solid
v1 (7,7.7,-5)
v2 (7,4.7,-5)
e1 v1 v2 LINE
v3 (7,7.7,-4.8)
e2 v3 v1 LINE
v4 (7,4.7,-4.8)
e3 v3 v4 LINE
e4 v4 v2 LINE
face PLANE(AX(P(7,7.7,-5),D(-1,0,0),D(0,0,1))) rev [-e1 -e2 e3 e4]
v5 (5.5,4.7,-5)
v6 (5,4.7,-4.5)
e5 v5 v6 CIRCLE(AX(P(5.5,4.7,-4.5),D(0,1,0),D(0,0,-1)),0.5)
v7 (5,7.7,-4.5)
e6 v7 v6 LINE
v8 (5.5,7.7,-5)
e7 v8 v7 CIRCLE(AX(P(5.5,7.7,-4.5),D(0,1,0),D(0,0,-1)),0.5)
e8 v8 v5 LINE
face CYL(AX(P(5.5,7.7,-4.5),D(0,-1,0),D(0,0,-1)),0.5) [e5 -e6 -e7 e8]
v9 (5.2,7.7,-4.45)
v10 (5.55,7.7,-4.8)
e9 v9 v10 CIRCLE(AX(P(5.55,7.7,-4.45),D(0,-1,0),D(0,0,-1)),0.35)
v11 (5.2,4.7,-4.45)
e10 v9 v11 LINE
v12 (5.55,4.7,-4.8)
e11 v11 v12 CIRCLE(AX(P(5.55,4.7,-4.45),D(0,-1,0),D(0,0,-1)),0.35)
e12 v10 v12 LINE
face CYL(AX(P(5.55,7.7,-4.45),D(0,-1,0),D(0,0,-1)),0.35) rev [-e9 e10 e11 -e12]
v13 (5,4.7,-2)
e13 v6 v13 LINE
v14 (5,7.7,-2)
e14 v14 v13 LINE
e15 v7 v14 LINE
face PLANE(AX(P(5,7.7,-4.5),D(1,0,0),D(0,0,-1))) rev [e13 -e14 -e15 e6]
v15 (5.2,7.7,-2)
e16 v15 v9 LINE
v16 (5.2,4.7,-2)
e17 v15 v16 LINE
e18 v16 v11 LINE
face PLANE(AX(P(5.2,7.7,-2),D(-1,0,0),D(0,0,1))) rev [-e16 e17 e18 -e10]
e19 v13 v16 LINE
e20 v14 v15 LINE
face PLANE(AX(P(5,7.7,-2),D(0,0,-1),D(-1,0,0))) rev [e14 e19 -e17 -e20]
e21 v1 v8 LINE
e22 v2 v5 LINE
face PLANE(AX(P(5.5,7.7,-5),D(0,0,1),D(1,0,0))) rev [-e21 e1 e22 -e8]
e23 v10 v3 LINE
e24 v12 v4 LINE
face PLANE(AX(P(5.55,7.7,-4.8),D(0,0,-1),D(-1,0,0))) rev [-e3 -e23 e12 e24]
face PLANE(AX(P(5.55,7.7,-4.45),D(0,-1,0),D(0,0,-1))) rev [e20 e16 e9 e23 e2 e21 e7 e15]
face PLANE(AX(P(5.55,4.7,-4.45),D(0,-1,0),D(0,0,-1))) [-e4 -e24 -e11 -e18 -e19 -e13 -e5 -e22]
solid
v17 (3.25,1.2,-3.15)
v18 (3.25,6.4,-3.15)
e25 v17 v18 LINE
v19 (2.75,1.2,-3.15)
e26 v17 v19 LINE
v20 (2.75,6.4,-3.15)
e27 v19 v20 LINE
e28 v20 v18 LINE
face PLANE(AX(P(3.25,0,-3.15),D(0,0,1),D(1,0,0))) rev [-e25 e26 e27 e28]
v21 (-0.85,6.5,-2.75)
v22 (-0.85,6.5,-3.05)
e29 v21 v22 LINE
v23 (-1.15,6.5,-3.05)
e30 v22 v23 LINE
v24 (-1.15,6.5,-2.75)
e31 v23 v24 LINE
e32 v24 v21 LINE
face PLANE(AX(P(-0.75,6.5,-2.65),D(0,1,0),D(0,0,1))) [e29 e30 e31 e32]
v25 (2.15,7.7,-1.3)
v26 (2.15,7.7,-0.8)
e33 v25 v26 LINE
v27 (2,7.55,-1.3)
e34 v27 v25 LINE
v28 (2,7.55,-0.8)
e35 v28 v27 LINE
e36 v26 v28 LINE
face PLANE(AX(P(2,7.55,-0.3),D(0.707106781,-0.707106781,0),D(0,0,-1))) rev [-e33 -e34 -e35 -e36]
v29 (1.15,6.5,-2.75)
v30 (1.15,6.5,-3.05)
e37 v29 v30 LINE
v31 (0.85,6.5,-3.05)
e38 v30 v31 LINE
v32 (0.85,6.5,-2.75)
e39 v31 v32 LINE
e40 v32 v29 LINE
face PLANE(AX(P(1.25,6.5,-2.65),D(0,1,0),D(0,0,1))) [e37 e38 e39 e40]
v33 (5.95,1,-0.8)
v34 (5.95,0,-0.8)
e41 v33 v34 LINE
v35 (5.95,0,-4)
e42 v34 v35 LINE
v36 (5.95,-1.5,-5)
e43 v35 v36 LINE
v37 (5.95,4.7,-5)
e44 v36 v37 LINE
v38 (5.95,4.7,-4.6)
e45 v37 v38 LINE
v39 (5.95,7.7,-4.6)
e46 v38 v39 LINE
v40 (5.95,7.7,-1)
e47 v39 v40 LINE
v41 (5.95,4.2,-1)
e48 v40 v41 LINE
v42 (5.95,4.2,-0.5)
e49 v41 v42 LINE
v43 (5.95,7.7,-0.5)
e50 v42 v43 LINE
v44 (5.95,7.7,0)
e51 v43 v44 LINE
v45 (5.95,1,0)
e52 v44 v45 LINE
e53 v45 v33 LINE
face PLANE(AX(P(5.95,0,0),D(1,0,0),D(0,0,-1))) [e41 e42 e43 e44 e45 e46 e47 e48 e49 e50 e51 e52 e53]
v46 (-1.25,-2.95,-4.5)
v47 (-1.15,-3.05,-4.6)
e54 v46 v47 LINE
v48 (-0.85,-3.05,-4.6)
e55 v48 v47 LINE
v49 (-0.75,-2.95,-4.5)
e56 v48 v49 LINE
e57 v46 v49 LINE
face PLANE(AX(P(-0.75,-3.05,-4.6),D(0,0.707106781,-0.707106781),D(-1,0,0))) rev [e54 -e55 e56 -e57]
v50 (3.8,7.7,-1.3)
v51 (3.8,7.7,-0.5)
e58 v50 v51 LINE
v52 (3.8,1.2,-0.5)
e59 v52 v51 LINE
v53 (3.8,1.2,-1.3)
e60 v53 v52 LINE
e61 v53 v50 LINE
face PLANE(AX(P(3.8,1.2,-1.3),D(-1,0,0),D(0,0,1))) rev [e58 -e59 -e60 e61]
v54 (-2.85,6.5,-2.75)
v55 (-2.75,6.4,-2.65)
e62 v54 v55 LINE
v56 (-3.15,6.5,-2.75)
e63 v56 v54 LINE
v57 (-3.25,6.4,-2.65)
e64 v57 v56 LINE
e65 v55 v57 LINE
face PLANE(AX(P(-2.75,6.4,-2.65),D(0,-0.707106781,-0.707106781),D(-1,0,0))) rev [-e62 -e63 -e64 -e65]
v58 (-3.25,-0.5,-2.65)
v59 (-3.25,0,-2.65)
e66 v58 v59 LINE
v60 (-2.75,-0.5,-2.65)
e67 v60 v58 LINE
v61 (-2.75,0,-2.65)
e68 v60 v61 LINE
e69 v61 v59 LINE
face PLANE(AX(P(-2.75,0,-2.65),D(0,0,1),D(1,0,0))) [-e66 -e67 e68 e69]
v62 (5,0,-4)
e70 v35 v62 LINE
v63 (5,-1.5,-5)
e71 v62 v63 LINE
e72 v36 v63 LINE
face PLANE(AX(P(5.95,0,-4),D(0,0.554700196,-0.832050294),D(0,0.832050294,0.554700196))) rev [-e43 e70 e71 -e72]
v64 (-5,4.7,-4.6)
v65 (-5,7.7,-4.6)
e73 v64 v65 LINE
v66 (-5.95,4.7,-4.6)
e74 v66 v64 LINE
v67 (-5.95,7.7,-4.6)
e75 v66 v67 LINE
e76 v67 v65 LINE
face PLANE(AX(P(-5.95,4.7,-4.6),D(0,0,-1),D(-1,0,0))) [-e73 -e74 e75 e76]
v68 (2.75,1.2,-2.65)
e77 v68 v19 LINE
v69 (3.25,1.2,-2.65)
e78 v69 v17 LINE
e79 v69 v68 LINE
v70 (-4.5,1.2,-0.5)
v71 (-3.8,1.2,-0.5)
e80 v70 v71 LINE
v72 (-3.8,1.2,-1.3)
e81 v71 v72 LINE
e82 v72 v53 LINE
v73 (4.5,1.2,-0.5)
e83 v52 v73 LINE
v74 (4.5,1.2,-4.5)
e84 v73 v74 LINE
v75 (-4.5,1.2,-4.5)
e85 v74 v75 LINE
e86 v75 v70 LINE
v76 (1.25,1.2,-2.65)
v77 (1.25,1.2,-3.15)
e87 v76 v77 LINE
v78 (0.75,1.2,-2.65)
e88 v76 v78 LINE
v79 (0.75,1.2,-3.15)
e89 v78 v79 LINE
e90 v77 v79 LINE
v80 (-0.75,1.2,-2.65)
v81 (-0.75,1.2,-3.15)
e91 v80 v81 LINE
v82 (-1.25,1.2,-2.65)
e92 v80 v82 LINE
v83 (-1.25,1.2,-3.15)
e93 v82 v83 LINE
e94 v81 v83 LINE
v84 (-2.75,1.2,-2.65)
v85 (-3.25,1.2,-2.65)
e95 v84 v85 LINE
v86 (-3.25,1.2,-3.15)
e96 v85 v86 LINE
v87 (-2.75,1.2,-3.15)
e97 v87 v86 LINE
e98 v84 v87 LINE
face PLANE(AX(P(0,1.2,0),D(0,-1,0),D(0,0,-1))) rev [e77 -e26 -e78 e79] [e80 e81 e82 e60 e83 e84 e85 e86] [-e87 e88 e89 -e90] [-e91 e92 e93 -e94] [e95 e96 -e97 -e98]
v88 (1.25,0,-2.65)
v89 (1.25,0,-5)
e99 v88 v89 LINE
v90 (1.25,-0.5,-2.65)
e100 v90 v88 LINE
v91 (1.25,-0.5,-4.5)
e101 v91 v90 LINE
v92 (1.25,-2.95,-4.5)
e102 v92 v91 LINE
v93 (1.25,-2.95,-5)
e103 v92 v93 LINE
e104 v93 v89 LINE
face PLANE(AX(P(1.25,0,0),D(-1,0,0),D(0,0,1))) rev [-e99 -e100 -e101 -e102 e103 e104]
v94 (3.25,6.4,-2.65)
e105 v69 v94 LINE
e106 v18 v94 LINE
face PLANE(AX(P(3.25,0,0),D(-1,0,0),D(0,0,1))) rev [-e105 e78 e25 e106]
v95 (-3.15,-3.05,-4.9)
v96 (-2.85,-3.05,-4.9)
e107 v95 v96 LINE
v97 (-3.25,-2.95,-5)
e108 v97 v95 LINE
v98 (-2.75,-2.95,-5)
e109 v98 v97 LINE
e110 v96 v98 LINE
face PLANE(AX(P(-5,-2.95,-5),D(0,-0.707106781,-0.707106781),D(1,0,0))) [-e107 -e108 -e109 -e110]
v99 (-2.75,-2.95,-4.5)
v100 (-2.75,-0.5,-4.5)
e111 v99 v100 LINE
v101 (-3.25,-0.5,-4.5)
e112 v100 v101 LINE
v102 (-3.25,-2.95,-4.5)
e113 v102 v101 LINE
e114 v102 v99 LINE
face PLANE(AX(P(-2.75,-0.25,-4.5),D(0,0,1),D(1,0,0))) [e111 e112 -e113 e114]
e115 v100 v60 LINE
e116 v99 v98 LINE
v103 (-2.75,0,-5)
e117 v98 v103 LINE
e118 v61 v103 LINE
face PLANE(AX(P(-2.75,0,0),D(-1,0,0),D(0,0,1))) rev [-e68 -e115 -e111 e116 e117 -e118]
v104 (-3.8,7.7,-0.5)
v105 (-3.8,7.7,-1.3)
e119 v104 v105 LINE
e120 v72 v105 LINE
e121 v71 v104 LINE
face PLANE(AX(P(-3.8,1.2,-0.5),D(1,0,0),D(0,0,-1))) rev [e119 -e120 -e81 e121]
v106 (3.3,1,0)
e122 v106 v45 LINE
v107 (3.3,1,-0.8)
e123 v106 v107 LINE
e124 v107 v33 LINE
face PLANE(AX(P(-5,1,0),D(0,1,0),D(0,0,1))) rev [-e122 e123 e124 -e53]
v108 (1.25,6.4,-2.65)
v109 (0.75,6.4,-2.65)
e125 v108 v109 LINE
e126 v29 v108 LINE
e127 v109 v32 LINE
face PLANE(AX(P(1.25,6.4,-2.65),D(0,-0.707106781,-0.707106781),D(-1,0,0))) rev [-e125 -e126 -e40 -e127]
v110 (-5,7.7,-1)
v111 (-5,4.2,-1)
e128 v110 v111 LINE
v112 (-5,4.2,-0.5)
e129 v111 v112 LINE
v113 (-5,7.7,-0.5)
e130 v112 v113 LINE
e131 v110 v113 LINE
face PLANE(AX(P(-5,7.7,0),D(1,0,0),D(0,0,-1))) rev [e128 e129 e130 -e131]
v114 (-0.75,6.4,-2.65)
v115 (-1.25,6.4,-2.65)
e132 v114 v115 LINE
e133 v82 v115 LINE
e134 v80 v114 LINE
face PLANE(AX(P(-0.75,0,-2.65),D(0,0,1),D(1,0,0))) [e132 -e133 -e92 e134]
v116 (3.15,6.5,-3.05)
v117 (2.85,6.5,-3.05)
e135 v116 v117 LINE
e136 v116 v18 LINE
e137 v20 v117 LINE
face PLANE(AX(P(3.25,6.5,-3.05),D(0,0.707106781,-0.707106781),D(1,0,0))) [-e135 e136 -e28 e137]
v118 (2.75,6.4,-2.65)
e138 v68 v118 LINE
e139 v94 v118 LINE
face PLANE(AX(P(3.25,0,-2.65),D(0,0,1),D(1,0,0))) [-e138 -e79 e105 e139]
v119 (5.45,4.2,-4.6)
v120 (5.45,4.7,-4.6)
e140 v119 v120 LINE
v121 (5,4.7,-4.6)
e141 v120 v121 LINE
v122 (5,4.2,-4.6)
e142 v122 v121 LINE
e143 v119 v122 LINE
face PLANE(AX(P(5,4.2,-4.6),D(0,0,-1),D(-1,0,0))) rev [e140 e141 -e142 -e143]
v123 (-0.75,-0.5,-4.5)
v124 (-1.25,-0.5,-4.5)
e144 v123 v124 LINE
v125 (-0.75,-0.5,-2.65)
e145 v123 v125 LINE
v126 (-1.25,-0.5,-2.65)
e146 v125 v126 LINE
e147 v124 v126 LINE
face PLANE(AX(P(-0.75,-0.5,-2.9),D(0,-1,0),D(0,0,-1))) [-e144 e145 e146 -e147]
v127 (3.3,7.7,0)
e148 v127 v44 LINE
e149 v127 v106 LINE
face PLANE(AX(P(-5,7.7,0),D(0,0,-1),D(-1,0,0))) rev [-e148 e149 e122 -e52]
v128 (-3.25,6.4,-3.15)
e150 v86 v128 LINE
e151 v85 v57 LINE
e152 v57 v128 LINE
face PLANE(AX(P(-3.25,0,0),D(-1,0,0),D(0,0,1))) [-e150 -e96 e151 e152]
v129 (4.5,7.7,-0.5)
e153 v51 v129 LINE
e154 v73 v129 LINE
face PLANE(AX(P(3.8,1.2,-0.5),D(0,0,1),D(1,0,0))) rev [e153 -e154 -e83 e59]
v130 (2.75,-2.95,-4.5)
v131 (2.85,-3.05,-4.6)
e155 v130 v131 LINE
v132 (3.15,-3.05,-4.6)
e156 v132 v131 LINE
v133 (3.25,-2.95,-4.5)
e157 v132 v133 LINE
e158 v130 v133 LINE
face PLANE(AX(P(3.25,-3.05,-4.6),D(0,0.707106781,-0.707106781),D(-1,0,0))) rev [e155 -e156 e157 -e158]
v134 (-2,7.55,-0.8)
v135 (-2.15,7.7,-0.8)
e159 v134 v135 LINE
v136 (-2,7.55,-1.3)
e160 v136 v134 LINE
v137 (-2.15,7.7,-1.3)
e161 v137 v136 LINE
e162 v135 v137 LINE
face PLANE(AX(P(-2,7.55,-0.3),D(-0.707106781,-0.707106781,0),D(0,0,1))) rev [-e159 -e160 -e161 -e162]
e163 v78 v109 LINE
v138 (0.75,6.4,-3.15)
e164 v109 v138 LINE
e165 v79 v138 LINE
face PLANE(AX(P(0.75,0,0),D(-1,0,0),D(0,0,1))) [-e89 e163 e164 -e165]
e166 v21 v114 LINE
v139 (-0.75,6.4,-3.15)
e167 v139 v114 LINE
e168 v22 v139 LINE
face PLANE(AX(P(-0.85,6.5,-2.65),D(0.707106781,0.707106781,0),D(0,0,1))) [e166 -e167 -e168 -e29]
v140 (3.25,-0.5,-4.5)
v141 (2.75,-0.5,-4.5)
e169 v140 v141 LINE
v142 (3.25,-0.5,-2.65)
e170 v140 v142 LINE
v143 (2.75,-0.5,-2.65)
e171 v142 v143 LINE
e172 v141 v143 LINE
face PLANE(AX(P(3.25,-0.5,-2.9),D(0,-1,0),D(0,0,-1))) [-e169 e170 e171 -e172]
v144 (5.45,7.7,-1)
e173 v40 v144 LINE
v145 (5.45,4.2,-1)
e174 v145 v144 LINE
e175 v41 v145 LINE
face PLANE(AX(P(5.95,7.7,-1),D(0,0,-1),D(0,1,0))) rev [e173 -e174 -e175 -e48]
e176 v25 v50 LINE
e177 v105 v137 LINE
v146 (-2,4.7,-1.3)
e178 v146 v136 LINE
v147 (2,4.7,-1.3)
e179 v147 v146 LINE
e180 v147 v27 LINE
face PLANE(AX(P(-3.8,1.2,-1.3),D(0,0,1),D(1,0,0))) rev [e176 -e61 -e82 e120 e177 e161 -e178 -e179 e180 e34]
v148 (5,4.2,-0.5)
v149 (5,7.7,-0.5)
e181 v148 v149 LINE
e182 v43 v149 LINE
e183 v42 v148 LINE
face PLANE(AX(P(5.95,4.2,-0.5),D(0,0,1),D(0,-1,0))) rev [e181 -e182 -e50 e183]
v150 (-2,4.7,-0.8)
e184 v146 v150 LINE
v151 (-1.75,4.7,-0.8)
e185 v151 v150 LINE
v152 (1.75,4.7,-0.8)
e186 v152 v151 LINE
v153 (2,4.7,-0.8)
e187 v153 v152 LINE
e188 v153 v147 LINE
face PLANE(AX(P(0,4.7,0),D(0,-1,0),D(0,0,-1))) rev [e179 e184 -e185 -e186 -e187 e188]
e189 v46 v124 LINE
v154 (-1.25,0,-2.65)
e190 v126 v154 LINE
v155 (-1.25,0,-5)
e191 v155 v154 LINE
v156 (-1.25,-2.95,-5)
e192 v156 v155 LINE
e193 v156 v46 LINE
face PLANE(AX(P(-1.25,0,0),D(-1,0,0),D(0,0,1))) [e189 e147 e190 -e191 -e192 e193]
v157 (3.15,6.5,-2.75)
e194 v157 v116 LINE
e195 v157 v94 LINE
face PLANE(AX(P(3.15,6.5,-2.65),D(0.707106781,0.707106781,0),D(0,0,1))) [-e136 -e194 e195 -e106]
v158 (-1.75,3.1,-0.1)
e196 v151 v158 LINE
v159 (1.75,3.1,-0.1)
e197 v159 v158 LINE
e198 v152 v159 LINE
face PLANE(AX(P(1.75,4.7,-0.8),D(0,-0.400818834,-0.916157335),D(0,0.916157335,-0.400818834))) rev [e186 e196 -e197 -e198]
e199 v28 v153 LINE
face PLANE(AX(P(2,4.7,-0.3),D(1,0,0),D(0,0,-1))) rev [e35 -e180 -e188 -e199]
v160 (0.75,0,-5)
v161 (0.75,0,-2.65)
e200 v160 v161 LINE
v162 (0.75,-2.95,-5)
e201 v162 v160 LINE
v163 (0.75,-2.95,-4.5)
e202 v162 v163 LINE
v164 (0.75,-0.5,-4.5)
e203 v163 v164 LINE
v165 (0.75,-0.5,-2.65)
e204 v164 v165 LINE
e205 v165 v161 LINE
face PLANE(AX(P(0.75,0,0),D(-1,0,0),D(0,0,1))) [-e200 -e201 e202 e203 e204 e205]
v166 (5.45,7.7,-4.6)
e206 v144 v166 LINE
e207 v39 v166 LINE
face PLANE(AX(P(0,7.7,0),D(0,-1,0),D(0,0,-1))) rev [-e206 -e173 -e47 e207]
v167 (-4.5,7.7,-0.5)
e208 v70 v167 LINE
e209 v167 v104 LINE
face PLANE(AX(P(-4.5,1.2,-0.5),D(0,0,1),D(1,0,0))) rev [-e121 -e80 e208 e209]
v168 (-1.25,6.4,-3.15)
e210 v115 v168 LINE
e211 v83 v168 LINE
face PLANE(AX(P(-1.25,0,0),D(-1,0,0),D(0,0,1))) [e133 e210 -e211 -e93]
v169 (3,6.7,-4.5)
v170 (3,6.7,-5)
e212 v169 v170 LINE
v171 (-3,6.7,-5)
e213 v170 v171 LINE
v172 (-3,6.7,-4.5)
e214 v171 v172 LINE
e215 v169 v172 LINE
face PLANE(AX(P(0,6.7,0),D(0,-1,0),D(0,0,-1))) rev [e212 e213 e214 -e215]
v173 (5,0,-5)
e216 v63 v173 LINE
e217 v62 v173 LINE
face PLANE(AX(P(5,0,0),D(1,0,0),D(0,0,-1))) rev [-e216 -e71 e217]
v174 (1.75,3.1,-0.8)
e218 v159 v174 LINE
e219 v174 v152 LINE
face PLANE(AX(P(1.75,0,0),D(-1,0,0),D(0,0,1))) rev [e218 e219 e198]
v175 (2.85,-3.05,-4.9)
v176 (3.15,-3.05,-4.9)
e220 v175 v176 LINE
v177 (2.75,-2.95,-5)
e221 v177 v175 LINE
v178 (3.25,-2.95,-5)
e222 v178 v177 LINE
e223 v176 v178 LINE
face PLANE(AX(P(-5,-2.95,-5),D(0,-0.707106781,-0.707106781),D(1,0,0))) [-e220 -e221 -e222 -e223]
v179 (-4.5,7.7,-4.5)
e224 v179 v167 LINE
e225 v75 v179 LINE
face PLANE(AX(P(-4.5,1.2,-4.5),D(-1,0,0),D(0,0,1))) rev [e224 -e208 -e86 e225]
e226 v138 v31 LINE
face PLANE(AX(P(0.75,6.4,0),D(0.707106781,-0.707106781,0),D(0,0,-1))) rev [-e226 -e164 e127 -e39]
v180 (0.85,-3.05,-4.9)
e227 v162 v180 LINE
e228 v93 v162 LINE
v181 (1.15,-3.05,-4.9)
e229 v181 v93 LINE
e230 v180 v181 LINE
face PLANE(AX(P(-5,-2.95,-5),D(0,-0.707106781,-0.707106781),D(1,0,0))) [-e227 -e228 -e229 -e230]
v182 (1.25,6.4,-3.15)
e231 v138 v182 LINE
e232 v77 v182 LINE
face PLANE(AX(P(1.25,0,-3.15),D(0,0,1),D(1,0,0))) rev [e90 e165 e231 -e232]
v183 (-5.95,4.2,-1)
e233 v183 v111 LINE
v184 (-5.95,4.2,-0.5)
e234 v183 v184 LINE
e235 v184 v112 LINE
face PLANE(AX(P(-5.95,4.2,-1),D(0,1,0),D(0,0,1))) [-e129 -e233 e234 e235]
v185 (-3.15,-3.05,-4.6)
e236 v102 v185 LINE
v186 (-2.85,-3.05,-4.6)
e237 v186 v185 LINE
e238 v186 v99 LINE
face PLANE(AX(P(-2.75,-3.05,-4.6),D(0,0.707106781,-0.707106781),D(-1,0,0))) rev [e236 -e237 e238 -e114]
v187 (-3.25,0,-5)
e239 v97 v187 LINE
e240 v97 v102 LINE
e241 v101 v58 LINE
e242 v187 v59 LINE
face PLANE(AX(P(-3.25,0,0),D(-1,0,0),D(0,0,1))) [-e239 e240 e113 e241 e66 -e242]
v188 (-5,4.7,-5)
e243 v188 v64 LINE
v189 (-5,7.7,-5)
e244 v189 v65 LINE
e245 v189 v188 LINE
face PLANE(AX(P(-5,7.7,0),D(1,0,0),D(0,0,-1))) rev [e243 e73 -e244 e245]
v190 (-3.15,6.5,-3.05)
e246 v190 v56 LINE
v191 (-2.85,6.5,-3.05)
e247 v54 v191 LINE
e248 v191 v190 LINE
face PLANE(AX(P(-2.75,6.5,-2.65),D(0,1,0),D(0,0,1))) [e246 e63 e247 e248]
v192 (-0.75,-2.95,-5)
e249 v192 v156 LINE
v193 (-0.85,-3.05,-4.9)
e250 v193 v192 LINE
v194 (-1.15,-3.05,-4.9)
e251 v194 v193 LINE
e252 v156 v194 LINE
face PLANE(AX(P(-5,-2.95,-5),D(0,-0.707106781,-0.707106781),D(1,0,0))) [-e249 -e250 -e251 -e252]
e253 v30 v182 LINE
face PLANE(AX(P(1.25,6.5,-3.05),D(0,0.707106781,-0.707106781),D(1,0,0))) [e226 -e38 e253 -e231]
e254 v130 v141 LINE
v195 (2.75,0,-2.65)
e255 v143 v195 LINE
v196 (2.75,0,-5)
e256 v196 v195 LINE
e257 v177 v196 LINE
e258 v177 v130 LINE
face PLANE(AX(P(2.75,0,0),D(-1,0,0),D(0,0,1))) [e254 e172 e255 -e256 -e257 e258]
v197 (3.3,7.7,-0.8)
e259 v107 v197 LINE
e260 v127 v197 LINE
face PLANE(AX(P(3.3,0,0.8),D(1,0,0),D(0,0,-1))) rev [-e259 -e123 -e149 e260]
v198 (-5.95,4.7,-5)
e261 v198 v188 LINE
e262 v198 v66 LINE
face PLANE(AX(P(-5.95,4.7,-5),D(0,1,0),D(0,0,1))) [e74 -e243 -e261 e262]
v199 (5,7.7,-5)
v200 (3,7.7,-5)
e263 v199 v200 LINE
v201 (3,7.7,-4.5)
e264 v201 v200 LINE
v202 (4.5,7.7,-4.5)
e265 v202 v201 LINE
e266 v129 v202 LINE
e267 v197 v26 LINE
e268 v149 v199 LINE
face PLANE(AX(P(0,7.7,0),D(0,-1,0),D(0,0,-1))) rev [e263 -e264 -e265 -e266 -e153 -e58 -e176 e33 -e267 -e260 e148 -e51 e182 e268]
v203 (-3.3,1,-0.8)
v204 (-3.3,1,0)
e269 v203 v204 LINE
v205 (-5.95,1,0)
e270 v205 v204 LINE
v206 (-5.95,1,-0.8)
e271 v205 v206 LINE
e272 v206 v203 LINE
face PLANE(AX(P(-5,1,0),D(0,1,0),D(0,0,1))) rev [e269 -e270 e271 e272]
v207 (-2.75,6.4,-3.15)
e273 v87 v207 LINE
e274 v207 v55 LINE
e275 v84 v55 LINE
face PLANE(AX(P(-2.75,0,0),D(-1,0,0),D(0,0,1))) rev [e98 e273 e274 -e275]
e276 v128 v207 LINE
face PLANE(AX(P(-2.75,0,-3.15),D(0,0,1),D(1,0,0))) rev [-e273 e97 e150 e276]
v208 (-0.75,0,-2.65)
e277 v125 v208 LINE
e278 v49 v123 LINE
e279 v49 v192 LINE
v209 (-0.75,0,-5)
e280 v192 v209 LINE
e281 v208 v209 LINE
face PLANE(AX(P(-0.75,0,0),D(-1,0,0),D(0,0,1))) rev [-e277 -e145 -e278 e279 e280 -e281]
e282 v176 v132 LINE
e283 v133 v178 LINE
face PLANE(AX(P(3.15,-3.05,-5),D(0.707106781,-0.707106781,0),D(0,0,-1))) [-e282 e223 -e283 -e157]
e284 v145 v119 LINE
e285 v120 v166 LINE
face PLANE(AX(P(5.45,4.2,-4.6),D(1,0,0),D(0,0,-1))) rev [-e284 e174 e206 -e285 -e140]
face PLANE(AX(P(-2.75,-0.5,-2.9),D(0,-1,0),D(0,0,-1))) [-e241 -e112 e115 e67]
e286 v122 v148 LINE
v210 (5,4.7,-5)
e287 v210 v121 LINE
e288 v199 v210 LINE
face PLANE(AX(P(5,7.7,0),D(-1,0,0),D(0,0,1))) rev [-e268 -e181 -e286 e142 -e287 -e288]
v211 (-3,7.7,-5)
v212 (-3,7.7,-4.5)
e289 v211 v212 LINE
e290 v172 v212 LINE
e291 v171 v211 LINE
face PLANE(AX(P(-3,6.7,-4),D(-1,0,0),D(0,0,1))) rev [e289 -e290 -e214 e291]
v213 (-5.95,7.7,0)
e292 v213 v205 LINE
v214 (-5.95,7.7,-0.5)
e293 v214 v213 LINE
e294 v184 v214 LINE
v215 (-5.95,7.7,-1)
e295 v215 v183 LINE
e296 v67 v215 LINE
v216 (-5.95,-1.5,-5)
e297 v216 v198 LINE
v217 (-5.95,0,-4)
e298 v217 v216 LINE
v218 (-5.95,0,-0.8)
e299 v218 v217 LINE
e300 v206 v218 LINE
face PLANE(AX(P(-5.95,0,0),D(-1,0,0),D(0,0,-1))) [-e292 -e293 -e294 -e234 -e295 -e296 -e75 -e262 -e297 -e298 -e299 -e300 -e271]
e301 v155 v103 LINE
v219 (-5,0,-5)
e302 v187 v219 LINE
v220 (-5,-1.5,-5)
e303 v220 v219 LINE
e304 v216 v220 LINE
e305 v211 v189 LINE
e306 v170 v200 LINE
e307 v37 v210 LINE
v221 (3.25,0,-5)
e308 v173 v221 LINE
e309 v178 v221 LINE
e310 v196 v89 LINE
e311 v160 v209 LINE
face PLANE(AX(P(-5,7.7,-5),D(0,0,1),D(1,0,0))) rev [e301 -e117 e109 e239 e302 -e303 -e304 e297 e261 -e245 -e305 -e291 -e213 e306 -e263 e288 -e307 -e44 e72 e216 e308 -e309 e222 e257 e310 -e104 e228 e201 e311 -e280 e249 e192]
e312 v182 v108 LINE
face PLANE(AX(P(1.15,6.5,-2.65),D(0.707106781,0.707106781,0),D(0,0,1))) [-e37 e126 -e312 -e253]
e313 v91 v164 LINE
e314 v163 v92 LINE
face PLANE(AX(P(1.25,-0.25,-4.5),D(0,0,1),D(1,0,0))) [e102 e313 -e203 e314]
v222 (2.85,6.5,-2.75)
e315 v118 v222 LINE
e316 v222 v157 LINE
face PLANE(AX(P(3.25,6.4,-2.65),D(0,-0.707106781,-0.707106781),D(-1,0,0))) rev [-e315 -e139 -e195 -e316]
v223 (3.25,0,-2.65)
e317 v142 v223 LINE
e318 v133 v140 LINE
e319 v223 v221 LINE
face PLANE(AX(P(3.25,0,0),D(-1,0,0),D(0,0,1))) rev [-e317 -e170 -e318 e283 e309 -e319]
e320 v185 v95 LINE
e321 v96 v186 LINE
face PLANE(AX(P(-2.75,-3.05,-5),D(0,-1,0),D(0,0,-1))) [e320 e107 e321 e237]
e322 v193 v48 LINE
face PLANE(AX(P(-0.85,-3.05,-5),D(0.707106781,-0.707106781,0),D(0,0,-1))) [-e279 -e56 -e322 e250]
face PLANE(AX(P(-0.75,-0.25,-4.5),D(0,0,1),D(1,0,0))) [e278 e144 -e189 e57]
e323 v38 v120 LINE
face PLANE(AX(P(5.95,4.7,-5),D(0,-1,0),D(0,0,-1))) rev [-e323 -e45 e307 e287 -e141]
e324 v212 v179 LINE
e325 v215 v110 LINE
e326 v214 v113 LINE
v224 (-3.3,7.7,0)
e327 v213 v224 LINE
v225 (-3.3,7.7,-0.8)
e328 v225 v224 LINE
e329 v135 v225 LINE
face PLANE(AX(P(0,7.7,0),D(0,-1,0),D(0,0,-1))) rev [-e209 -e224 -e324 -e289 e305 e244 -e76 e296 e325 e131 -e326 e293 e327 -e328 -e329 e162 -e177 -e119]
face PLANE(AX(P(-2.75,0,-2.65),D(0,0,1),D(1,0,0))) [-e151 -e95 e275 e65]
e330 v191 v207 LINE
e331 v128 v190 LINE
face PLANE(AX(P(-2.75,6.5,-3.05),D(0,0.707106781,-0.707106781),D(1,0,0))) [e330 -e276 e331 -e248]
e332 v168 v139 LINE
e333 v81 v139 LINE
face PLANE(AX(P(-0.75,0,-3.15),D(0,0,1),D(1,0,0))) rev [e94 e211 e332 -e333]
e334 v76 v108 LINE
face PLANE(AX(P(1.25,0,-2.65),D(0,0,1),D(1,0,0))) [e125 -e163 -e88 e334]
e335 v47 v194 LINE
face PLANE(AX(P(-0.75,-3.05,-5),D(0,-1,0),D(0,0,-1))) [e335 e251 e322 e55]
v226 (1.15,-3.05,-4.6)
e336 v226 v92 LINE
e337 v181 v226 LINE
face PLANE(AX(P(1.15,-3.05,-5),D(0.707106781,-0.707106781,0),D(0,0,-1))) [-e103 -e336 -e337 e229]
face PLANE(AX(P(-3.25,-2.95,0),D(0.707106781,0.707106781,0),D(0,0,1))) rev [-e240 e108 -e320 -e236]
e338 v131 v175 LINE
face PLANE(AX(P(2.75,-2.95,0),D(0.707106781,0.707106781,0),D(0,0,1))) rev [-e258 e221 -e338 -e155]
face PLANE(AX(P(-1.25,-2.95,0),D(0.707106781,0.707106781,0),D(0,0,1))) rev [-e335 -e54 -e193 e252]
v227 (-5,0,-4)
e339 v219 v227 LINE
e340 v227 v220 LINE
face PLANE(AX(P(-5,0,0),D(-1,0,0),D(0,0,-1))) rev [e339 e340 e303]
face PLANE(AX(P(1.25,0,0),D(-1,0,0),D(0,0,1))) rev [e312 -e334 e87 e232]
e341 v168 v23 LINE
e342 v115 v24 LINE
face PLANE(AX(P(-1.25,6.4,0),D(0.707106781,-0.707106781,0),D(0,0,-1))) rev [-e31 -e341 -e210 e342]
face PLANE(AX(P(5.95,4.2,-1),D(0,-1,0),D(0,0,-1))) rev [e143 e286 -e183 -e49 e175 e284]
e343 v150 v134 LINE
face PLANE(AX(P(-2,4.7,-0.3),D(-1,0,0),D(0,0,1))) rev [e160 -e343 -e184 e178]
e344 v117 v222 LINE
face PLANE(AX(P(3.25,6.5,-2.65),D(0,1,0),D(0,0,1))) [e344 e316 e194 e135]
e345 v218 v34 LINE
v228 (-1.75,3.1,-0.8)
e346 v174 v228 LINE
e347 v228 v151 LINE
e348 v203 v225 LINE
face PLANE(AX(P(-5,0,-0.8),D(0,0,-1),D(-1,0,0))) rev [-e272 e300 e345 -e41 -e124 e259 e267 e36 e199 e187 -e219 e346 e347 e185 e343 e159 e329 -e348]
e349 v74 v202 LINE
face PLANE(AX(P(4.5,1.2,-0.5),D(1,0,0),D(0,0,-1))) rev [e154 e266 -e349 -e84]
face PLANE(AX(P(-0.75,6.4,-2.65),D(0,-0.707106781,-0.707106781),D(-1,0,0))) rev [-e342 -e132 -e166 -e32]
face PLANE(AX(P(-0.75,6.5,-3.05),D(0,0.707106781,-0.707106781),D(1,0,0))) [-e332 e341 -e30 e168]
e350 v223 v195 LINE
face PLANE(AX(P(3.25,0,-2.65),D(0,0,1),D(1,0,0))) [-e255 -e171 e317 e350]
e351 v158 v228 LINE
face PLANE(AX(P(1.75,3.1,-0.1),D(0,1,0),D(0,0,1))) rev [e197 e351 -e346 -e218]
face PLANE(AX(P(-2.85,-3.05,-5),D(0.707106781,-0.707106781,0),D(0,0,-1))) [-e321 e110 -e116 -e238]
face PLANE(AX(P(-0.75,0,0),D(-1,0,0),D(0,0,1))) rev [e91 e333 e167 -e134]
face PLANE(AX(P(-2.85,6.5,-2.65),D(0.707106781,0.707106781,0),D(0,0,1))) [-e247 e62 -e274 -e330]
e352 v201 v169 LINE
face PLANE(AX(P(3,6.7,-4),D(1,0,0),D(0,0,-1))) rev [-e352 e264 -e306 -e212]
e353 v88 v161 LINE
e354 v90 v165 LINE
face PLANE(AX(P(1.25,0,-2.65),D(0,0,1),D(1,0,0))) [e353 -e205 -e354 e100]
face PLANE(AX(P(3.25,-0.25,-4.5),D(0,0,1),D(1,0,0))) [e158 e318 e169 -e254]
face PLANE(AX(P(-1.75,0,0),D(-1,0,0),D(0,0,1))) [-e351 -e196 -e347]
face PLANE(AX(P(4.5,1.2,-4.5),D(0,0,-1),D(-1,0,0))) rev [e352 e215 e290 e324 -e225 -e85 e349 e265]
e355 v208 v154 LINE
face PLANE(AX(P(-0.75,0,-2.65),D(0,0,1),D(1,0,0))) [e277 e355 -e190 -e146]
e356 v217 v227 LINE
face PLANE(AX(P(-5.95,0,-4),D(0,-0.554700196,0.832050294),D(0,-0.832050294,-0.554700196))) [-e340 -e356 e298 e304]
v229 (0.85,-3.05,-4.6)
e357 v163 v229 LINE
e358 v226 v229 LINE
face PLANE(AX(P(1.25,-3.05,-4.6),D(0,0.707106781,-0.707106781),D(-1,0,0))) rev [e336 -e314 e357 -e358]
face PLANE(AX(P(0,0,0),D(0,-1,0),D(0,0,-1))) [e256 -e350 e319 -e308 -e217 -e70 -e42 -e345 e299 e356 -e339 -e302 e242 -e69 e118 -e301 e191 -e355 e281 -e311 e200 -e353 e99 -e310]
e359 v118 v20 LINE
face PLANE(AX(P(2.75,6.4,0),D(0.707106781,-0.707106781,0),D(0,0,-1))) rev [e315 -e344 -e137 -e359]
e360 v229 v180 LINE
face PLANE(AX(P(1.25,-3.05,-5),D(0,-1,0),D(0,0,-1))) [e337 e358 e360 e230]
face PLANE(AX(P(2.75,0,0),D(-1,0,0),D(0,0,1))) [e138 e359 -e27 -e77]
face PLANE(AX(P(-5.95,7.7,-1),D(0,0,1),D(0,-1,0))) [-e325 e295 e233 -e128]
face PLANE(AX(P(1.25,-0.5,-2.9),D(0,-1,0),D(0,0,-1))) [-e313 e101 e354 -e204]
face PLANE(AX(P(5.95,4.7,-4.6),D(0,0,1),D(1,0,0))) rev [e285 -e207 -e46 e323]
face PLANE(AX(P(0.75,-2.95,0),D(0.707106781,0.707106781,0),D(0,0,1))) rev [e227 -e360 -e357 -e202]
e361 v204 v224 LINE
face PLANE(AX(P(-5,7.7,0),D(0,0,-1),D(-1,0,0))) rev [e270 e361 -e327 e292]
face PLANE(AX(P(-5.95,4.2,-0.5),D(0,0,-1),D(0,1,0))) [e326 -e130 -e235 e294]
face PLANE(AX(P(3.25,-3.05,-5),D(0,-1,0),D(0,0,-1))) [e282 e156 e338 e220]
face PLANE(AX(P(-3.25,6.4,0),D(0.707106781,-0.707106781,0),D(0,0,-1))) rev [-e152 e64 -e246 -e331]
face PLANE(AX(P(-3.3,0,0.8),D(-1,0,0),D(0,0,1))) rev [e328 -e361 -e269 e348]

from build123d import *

# Parameters (mm, degrees)
ESQUISSE1_W                             = 10
ESQUISSE1_H                             = 5
BOSS_EXTRU_1_DEPTH                      = 7.7
ESQUISSE7_W                             = 0.8
ESQUISSE7_H                             = 1
ENL_V_MAT_EXTRU_5_DEPTH                 = 14.575345299
ESQUISSE2_W                             = 6.6
ESQUISSE2_H                             = 1.6
ENL_V_MAT_EXTRU_1_DEPTH                 = 11.454185765
ENL_V_MAT_EXTRU_2_DEPTH                 = 6.5
ESQUISSE5_W                             = 6
ESQUISSE5_H                             = 1
ENL_V_MAT_EXTRU_3_DEPTH                 = 1
ESQUISSE6_W                             = 4
ESQUISSE6_H                             = 1
ENL_V_MAT_EXTRU_4_DEPTH                 = 3
BOSS_EXTRU_2_DEPTH                      = 1.75
CHANFREIN1_SIZE                         = 0.15
EXTRU_MINCE4_START                      = -0.25
EXTRU_MINCE4_OUTLINE_W                  = 0.5
EXTRU_MINCE4_OUTLINE_H                  = 5.3
EXTRU_MINCE4_DEPTH                      = 0.5
CHANFREIN6_SIZE                         = 0.1
R_P_TITION_LIN_AIRE8_COUNT              = 4
R_P_TITION_LIN_AIRE8_PITCH              = 2
CHANFREIN6_OF_R_P_TITION_LIN_AIRE8_SIZE = 0.1
BOSS_EXTRU_3_DEPTH                      = 0.95
ESQUISSE19_W                            = 0.45
ESQUISSE19_H                            = 3.6
ENL_V_MAT_EXTRU_6_DEPTH                 = 3.5
BOSS_EXTRU_4_DEPTH                      = 3


# Read off the part's stored shape, not the designer's step: Extru.-Mince4
with BuildPart() as part:
    # Esquisse1 → Boss.-Extru.1 (new body)
    with BuildSketch(Plane(origin=(0, 0, 0), x_dir=(1, 0, 0), z_dir=(0, 1, 0))):
        with Locations((0, 2.5)):
            Rectangle(ESQUISSE1_W, ESQUISSE1_H)
    extrude(amount=BOSS_EXTRU_1_DEPTH)

    # Esquisse7 → Enlèv. mat.-Extru.5 (cut, through all)
    with BuildSketch(Plane(origin=(5, 0, 0), x_dir=(0, 0, -1), z_dir=(1, 0, 0))):
        with Locations((0.4, 0.5)):
            Rectangle(ESQUISSE7_W, ESQUISSE7_H)
    extrude(amount=-ENL_V_MAT_EXTRU_5_DEPTH, mode=Mode.SUBTRACT)

    # Esquisse2 → Enlèv. mat.-Extru.1 (cut, through all)
    with BuildSketch(Plane(origin=(0, 7.7, 0), x_dir=(1, 0, 0), z_dir=(0, 1, 0))):
        Rectangle(ESQUISSE2_W, ESQUISSE2_H)
    extrude(amount=-ENL_V_MAT_EXTRU_1_DEPTH, mode=Mode.SUBTRACT)

    # Esquisse4 → Enlèv. mat.-Extru.2 (cut)
    with BuildSketch(Plane(origin=(0, 7.7, 0), x_dir=(1, 0, 0), z_dir=(0, 1, 0))):
        Polygon((-3.8, 1.3), (3.8, 1.3), (3.8, 0.5), (4.5, 0.5), (4.5, 4.5), (-4.5, 4.5), (-4.5, 0.5), (-3.8, 0.5), align=None)
    extrude(amount=-ENL_V_MAT_EXTRU_2_DEPTH, mode=Mode.SUBTRACT)

    # Esquisse5 → Enlèv. mat.-Extru.3 (cut)
    with BuildSketch(Plane(origin=(0, 7.7, 0), x_dir=(1, 0, 0), z_dir=(0, 1, 0))):
        with Locations((0, 4.5)):
            Rectangle(ESQUISSE5_W, ESQUISSE5_H)
    extrude(amount=-ENL_V_MAT_EXTRU_3_DEPTH, mode=Mode.SUBTRACT)

    # Esquisse6 → Enlèv. mat.-Extru.4 (cut)
    with BuildSketch(Plane(origin=(0, 7.7, 0), x_dir=(1, 0, 0), z_dir=(0, 1, 0))):
        with Locations((0, 0.8)):
            Rectangle(ESQUISSE6_W, ESQUISSE6_H)
    extrude(amount=-ENL_V_MAT_EXTRU_4_DEPTH, mode=Mode.SUBTRACT)

    # Esquisse11 → Boss.-Extru.2 (add, symmetric)
    with BuildSketch(Plane(origin=(0, 0, 0), x_dir=(0, 0, -1), z_dir=(1, 0, 0))):
        Polygon((0.8, 4.7), (0.1, 3.1), (0.8, 3.1), align=None)
    extrude(amount=BOSS_EXTRU_2_DEPTH, both=True)

    # Chanfrein1
    chanfrein1_edges = [part.edges().sort_by_distance(p)[0] for p in [
        (2, 7.7, -1.05),
        (-2, 7.7, -1.05),
    ]]
    chamfer(chanfrein1_edges, length=CHANFREIN1_SIZE)

    # Extru.-Mince4 outline → Extru.-Mince4 (add)
    with BuildSketch(Plane(origin=(3, 0, 0), x_dir=(0, 0, -1), z_dir=(1, 0, 0)).offset(EXTRU_MINCE4_START)):
        Polygon((2.65, -0.5), (4.5, -0.5), (4.5, -3.05), (5, -3.05), (5, 0), (2.65, 0), align=None)
        with Locations((2.9, 3.85)):
            Rectangle(EXTRU_MINCE4_OUTLINE_W, EXTRU_MINCE4_OUTLINE_H)
    extru_mince4 = extrude(amount=EXTRU_MINCE4_DEPTH)

    # Chanfrein6
    chanfrein6_edges = [part.edges().sort_by_distance(p)[0] for p in [
        (3, 6.5, -2.65),
        (2.75, 6.5, -2.9),
        (3.25, 6.5, -2.9),
        (3, 6.5, -3.15),
        (3.25, -3.05, -4.75),
        (3, -3.05, -4.5),
        (3, -3.05, -5),
        (2.75, -3.05, -4.75),
    ]]
    chamfer(chanfrein6_edges, length=CHANFREIN6_SIZE)

    # Répétition linéaire8: Extru.-Mince4 ×4
    with Locations(*[(-i * R_P_TITION_LIN_AIRE8_PITCH, 0, 0) for i in range(1, R_P_TITION_LIN_AIRE8_COUNT)]):
        add(extru_mince4)

    # Chanfrein6 of Répétition linéaire8
    chanfrein6_of_r_p_tition_lin_aire8_edges = [part.edges().sort_by_distance(p)[0] for p in [
        (1, 6.5, -2.65),
        (0.75, 6.5, -2.9),
        (1.25, 6.5, -2.9),
        (1, 6.5, -3.15),
        (1.25, -3.05, -4.75),
        (1, -3.05, -4.5),
        (1, -3.05, -5),
        (0.75, -3.05, -4.75),
        (-1, 6.5, -2.65),
        (-1.25, 6.5, -2.9),
        (-0.75, 6.5, -2.9),
        (-1, 6.5, -3.15),
        (-0.75, -3.05, -4.75),
        (-1, -3.05, -4.5),
        (-1, -3.05, -5),
        (-1.25, -3.05, -4.75),
        (-3, 6.5, -2.65),
        (-3.25, 6.5, -2.9),
        (-2.75, 6.5, -2.9),
        (-3, 6.5, -3.15),
        (-2.75, -3.05, -4.75),
        (-3, -3.05, -4.5),
        (-3, -3.05, -5),
        (-3.25, -3.05, -4.75),
    ]]
    chamfer(chanfrein6_of_r_p_tition_lin_aire8_edges, length=CHANFREIN6_OF_R_P_TITION_LIN_AIRE8_SIZE)

    # Esquisse18 → Boss.-Extru.3 (add)
    with BuildSketch(Plane(origin=(5, 0, 0), x_dir=(0, 0, -1), z_dir=(1, 0, 0))):
        Polygon((0, 7.7), (0, 1), (0.8, 1), (0.8, 0), (4, 0), (5, -1.5), (5, 0), (5, 4.7), (4.6, 4.7), (4.6, 7.7), (1, 7.7), (1, 4.2), (0.5, 4.2), (0.5, 7.7), align=None)
    boss_extru_3 = extrude(amount=BOSS_EXTRU_3_DEPTH)

    # Symétrie1: Boss.-Extru.3 across plane
    add(boss_extru_3.mirror(Plane(origin=(0, 0, 0), x_dir=(0, 0, 1), z_dir=(1, 0, 0))))

    # Esquisse19 → Enlèv. mat.-Extru.6 (cut)
    with BuildSketch(Plane(origin=(0, 7.7, 0), x_dir=(1, 0, 0), z_dir=(0, 1, 0))):
        with Locations((5.225, 2.8)):
            Rectangle(ESQUISSE19_W, ESQUISSE19_H)
    extrude(amount=-ENL_V_MAT_EXTRU_6_DEPTH, mode=Mode.SUBTRACT)


with BuildPart() as body_2:
    # Esquisse20 → Boss.-Extru.4 (new body)
    with BuildSketch(Plane(origin=(0, 4.7, 0), x_dir=(1, 0, 0), z_dir=(0, 1, 0))):
        with BuildLine():
            Line((5, 4.5), (5, 2))
            Line((5, 2), (5.2, 2))
            Line((5.2, 2), (5.2, 4.45))
            ThreePointArc((5.2, 4.45), (5.302512627, 4.697487373), (5.55, 4.8))
            Line((5.55, 4.8), (7, 4.8))
            Line((7, 4.8), (7, 5))
            Line((7, 5), (5.5, 5))
            ThreePointArc((5.5, 5), (5.146446609, 4.853553391), (5, 4.5))
        make_face()
    extrude(amount=BOSS_EXTRU_4_DEPTH)


solid = Compound([part.part, body_2.part])
